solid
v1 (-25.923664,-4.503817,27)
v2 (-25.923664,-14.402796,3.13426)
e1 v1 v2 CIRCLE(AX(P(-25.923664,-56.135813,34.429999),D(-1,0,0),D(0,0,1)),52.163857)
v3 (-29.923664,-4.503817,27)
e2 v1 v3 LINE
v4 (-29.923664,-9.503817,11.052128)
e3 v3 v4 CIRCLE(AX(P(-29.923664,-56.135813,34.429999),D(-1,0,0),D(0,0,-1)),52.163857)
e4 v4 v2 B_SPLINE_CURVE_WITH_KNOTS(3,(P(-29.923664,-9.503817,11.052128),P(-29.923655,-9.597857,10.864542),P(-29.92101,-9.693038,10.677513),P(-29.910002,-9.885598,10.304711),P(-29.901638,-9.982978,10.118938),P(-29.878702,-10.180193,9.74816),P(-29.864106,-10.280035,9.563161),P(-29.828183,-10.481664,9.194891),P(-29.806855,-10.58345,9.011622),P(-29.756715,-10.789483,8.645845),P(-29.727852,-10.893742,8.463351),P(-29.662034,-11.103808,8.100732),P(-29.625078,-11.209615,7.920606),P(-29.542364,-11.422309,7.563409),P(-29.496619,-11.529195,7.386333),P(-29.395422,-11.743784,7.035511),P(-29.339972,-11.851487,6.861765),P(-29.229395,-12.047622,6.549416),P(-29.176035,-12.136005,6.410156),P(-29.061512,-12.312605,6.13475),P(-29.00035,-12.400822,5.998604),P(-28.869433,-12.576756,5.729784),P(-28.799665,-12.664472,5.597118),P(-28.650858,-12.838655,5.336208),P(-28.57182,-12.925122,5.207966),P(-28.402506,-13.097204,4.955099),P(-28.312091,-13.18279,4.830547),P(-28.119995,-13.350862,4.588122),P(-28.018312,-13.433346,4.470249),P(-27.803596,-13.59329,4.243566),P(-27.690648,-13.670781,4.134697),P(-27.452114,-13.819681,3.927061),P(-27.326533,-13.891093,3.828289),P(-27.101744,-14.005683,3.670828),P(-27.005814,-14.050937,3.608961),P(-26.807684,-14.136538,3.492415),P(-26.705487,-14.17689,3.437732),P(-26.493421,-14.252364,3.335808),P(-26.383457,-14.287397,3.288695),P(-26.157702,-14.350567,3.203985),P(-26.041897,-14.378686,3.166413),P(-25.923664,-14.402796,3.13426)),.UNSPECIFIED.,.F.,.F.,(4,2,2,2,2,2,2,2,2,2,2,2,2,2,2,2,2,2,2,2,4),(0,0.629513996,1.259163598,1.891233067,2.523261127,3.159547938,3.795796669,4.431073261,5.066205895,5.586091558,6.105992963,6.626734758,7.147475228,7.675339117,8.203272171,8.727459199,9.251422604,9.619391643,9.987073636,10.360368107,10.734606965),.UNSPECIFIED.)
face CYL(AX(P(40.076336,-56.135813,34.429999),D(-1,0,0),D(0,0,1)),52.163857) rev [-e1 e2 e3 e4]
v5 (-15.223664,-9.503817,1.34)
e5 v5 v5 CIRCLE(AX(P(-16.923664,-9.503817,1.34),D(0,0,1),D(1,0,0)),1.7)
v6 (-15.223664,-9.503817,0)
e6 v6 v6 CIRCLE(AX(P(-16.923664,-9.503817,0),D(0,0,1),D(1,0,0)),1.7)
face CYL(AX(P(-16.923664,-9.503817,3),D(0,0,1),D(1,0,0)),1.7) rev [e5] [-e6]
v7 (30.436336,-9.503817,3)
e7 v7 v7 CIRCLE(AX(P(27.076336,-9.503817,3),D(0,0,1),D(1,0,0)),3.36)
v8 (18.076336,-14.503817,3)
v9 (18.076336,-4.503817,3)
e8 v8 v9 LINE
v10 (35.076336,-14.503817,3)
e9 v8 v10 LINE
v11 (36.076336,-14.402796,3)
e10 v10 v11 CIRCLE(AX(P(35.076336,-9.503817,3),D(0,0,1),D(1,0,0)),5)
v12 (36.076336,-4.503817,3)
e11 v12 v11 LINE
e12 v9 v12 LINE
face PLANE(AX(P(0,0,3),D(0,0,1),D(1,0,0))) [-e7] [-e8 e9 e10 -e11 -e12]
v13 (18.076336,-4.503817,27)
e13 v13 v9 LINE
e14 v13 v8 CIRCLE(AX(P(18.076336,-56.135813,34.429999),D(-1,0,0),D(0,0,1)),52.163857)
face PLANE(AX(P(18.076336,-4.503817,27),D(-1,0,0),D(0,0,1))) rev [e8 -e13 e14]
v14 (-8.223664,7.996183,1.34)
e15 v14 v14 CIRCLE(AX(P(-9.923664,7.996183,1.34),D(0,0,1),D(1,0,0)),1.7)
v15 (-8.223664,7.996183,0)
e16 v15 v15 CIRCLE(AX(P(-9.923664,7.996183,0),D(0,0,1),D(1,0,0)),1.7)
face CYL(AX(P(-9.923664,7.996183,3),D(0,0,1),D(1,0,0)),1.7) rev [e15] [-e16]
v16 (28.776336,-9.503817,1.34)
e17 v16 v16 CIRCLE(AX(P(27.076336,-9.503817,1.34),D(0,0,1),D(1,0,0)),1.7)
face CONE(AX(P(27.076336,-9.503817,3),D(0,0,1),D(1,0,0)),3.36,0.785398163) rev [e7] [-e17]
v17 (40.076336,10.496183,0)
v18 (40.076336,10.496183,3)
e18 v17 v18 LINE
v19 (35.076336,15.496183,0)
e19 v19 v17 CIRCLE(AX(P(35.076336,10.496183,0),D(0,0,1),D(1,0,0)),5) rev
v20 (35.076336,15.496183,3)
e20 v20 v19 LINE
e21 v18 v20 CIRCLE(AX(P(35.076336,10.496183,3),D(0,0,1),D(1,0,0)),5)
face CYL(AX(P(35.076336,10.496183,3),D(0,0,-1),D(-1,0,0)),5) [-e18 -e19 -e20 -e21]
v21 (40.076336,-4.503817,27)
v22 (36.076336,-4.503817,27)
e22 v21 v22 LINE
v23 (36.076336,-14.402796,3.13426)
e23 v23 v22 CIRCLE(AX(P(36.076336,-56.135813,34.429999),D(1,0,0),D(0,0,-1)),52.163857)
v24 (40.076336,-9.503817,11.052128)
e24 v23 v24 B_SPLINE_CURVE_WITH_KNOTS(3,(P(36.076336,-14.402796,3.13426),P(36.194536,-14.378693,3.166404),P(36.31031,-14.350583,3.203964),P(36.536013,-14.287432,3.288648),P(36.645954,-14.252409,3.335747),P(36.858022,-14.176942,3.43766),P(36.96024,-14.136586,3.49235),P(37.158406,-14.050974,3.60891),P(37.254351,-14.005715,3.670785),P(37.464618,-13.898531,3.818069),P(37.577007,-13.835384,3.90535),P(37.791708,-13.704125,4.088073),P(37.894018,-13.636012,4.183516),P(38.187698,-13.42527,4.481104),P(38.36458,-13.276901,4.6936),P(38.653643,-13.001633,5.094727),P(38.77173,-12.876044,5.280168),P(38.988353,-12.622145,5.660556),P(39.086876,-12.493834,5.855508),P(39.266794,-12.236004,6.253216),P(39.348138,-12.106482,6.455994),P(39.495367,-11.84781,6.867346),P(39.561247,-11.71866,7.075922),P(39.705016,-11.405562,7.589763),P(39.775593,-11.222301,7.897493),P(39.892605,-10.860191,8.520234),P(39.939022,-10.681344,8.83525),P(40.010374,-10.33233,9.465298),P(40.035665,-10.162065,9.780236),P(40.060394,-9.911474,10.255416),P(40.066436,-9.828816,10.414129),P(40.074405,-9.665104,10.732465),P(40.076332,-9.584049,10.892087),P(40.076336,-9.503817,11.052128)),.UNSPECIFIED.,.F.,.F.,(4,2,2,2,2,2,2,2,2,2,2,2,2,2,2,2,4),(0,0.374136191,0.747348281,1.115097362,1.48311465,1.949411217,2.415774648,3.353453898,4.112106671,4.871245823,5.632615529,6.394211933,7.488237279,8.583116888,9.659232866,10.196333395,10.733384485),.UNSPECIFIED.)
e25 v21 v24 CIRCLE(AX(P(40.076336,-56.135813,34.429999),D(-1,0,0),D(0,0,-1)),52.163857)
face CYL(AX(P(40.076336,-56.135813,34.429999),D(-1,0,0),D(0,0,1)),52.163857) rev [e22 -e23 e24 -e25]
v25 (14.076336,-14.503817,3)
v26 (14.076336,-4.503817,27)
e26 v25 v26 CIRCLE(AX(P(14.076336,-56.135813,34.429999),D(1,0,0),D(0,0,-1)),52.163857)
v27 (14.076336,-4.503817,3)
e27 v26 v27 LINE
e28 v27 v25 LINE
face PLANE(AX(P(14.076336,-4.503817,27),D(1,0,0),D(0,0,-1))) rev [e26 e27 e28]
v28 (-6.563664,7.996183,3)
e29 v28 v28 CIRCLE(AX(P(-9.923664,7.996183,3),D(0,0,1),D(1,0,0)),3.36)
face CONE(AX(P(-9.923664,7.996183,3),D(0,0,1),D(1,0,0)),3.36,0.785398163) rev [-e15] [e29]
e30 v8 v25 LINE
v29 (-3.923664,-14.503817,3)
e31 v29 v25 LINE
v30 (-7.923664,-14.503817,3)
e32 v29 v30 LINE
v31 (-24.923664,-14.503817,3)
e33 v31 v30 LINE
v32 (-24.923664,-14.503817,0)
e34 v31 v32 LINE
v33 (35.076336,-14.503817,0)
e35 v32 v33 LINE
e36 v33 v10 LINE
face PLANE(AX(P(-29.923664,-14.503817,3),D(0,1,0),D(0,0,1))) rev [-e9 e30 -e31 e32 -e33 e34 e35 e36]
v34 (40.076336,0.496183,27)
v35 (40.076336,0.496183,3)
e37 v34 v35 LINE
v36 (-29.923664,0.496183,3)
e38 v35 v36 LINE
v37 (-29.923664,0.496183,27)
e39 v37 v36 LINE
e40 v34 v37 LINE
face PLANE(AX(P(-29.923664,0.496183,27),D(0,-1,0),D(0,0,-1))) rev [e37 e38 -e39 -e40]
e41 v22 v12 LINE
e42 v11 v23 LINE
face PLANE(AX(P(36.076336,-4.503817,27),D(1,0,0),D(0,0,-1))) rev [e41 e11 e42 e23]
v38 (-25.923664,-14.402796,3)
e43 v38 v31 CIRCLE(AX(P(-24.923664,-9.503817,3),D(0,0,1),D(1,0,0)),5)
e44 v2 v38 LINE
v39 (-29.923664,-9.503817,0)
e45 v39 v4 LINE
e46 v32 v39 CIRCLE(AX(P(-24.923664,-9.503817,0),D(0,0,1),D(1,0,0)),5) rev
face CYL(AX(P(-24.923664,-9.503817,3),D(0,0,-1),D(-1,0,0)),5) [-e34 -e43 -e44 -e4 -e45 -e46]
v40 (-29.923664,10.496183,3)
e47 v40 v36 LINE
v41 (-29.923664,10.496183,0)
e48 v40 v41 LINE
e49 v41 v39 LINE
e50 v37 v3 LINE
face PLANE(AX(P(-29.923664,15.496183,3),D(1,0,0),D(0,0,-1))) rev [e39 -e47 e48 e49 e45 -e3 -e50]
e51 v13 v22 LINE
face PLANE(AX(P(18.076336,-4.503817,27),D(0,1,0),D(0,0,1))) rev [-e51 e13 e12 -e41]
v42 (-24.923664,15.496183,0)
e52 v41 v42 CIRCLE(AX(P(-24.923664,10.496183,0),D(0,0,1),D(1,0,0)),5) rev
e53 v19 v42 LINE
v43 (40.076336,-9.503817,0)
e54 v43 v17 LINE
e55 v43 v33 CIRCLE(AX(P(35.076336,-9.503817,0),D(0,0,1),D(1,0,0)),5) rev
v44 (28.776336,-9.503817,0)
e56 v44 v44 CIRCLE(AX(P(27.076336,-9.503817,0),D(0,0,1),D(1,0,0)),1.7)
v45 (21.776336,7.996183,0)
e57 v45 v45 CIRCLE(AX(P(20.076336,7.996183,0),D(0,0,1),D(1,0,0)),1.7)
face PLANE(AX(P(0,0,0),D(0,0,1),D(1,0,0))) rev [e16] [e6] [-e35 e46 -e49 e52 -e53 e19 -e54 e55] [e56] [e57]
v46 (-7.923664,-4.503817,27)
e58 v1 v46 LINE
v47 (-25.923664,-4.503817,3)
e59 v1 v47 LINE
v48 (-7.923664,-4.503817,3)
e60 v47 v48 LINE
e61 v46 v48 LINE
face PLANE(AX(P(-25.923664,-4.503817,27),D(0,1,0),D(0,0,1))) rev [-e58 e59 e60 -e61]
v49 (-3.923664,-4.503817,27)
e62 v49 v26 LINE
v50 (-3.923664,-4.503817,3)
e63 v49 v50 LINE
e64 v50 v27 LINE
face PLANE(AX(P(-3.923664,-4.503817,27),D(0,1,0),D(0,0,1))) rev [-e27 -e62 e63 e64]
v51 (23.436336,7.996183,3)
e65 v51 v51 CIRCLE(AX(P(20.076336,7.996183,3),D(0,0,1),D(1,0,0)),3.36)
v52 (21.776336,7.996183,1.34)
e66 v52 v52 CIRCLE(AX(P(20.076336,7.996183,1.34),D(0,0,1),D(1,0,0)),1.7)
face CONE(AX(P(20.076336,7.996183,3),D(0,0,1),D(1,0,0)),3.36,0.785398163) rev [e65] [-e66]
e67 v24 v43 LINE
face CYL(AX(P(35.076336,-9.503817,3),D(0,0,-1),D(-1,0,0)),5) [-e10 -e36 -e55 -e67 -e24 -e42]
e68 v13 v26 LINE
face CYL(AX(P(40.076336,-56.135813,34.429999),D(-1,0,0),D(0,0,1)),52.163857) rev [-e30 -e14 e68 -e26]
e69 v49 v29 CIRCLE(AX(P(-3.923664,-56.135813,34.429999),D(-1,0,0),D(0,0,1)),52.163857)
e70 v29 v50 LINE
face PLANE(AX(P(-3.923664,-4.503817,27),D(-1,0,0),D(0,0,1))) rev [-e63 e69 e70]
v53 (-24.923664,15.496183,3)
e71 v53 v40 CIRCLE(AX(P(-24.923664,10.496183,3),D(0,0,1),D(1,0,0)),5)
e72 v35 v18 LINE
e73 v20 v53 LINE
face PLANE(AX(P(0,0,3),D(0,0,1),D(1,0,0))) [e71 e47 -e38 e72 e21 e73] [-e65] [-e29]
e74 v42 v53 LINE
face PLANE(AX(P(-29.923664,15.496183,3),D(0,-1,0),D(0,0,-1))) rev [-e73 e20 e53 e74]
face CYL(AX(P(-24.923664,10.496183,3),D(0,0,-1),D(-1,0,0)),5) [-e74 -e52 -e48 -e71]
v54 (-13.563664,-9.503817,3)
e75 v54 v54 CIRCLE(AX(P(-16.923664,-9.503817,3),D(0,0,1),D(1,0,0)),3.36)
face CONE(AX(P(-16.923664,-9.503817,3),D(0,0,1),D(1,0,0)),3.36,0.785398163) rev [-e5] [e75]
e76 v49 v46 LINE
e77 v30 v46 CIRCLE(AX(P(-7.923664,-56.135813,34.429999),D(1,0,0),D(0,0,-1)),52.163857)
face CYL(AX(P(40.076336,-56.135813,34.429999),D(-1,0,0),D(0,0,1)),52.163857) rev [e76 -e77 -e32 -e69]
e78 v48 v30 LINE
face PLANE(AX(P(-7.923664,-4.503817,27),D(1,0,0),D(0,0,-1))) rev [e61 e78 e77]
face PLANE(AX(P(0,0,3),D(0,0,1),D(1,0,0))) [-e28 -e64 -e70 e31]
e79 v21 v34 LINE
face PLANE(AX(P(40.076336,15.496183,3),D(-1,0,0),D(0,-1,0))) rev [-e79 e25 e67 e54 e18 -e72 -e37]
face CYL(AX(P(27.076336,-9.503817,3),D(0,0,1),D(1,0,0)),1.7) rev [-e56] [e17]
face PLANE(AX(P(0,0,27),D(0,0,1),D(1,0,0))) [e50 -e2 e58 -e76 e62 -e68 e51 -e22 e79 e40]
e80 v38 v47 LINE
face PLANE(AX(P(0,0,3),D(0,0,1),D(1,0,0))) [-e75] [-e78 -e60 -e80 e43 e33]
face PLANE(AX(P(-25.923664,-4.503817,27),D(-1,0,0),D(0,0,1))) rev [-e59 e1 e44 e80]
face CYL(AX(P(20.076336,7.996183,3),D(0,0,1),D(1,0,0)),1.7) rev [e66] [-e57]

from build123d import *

# Parameters (mm, degrees)
CROQUIS1_W                                   = 70
CROQUIS1_H                                   = 30
SALIENTE_EXTRUIR1_DEPTH                      = 3
SALIENTE_EXTRUIR2_DEPTH                      = 24
CORTAR_EXTRUIR1_DEPTH                        = 70.000004
CROQUIS5_R                                   = 1.5
CORTAR_EXTRUIR2_DEPTH                        = 3
REFRENTADO_PARA_TORNILLO_TAP_N_CON_C_2_COUNT = 2
REFRENTADO_PARA_TORNILLO_TAP_N_CON_C_2_PITCH = 30
REFRENTADO_PARA_TORNILLO_TAP_N_CON_C_3_COUNT = 2
REFRENTADO_PARA_TORNILLO_TAP_N_CON_C_3_PITCH = 18.848076825
REFRENTADO_PARA_TORNILLO_TAP_N_CON_C_4_COUNT = 2
REFRENTADO_PARA_TORNILLO_TAP_N_CON_C_4_PITCH = 40.929817982
REDONDEO1_R                                  = 5


with BuildPart() as part:
    # Croquis1 → Saliente-Extruir1 (new body)
    with BuildSketch(Plane.XY):
        with Locations((5.076335878, 0.496183206)):
            Rectangle(CROQUIS1_W, CROQUIS1_H)
    extrude(amount=SALIENTE_EXTRUIR1_DEPTH)

    # Croquis3 → Saliente-Extruir2 (add)
    with BuildSketch(Plane.XY.offset(3)):
        Polygon((-29.923664122, 0.496183206), (40.076335878, 0.496183206), (40.076335878, -4.503816794), (40.076335878, -14.503816794), (36.076335878, -14.503816794), (36.076335878, -4.503816794), (18.076335878, -4.503816794), (18.076335878, -14.503816794), (14.076335878, -14.503816794), (14.076335878, -4.503816794), (-3.923664122, -4.503816794), (-3.923664122, -14.503816794), (-7.923664122, -14.503816794), (-7.923664122, -4.503816794), (-25.923664122, -4.503816794), (-25.923664122, -14.503816794), (-29.923664122, -14.503816794), (-29.923664122, -4.503816794), align=None)
    extrude(amount=SALIENTE_EXTRUIR2_DEPTH)

    # Croquis4 → Cortar-Extruir1 (cut)
    with BuildSketch(Plane.ZY.offset(29.923664122)):
        with BuildLine():
            Line((27, -14.503816794), (27, -4.503816794))
            ThreePointArc((27, -4.503816794), (14.366976751, -7.984560996), (3, -14.503816794))
            Line((3, -14.503816794), (27, -14.503816794))
        make_face()
    extrude(amount=-CORTAR_EXTRUIR1_DEPTH, mode=Mode.SUBTRACT)

    # Croquis5 → Cortar-Extruir2 (cut)
    with BuildSketch(Plane.XY.offset(3)):
        with Locations((-9.923664122, 7.996183206)):
            Circle(CROQUIS5_R)
        with Locations(Location((20.076335878, 7.996183206, 0), (0, 0, 180))):
            Circle(CROQUIS5_R)
        with Locations((-16.923664122, -9.503816794)):
            Circle(CROQUIS5_R)
        with Locations(Location((27.076335878, -9.503816794, 0), (0, 0, 180))):
            Circle(CROQUIS5_R)
    extrude(amount=-CORTAR_EXTRUIR2_DEPTH, mode=Mode.SUBTRACT)

    # Croquis7 → Refrentado para tornillo tapón con cabeza plana de clavija de M31 (revolve, cut)
    with BuildSketch(Plane(origin=(-9.923664122, 7.996183206, 3), x_dir=(0, -1, 0), z_dir=(1, 0, 0))):
        Polygon((0, 0), (0, 3), (1.7, 3), (1.7, 1.66), (3.36, 0), align=None)
    refrentado_para_tornillo_tap_n_con_cabez = revolve(axis=Axis((-9.923664122, 7.996183206, 9.35), (0, 0, -1)), mode=Mode.SUBTRACT)

    # Refrentado para tornillo tap_n con c 2: Refrentado para tornillo tapón con cabeza plana de clavija de M31 ×2
    with Locations(*[(i * REFRENTADO_PARA_TORNILLO_TAP_N_CON_C_2_PITCH, 0, 0) for i in range(1, REFRENTADO_PARA_TORNILLO_TAP_N_CON_C_2_COUNT)]):
        add(refrentado_para_tornillo_tap_n_con_cabez, mode=Mode.SUBTRACT)

    # Refrentado para tornillo tap_n con c 3: Refrentado para tornillo tapón con cabeza plana de clavija de M31 ×2
    with Locations(*[Vector(-0.3713906763541037, -0.9284766908852593, 0) * (i * REFRENTADO_PARA_TORNILLO_TAP_N_CON_C_3_PITCH) for i in range(1, REFRENTADO_PARA_TORNILLO_TAP_N_CON_C_3_COUNT)]):
        add(refrentado_para_tornillo_tap_n_con_cabez, mode=Mode.SUBTRACT)

    # Refrentado para tornillo tap_n con c 4: Refrentado para tornillo tapón con cabeza plana de clavija de M31 ×2
    with Locations(*[Vector(0.9039864290798859, -0.42756114888913443, 0) * (i * REFRENTADO_PARA_TORNILLO_TAP_N_CON_C_4_PITCH) for i in range(1, REFRENTADO_PARA_TORNILLO_TAP_N_CON_C_4_COUNT)]):
        add(refrentado_para_tornillo_tap_n_con_cabez, mode=Mode.SUBTRACT)

    # Redondeo1
    # the kernel refuses this fillet: 5 mm, written as the material it takes off along each edge
    with BuildSketch(Plane(origin=(40.076335878, -14.503816794, 15.5), x_dir=(0, 1, 0), z_dir=(0, 0, -1)), Plane(origin=(-29.923664122, -14.503816794, -12.5), x_dir=(0, 1, 0), z_dir=(0, 0, 1)), Plane(origin=(-29.923664122, 15.496183206, -12.5), x_dir=(1, 0, 0), z_dir=(0, 0, 1))) as redondeo1_piece_1:
        with BuildLine():
            CenterArc((REDONDEO1_R, -REDONDEO1_R), REDONDEO1_R, 90, 90)
            Line((0, -REDONDEO1_R), (0, 0))
            Line((0, 0), (REDONDEO1_R, 0))
        make_face()
    extrude(amount=28, mode=Mode.SUBTRACT)
    with BuildSketch(Plane(origin=(40.076335878, 15.496183206, -12.5), x_dir=(-1, 0, 0), z_dir=(0, 0, 1))) as redondeo1_piece_2:
        with BuildLine():
            CenterArc((REDONDEO1_R, REDONDEO1_R), REDONDEO1_R, 180, 90)
            Line((0, REDONDEO1_R), (0, 0))
            Line((0, 0), (REDONDEO1_R, 0))
        make_face()
    extrude(amount=28, mode=Mode.SUBTRACT)


solid = part.part
